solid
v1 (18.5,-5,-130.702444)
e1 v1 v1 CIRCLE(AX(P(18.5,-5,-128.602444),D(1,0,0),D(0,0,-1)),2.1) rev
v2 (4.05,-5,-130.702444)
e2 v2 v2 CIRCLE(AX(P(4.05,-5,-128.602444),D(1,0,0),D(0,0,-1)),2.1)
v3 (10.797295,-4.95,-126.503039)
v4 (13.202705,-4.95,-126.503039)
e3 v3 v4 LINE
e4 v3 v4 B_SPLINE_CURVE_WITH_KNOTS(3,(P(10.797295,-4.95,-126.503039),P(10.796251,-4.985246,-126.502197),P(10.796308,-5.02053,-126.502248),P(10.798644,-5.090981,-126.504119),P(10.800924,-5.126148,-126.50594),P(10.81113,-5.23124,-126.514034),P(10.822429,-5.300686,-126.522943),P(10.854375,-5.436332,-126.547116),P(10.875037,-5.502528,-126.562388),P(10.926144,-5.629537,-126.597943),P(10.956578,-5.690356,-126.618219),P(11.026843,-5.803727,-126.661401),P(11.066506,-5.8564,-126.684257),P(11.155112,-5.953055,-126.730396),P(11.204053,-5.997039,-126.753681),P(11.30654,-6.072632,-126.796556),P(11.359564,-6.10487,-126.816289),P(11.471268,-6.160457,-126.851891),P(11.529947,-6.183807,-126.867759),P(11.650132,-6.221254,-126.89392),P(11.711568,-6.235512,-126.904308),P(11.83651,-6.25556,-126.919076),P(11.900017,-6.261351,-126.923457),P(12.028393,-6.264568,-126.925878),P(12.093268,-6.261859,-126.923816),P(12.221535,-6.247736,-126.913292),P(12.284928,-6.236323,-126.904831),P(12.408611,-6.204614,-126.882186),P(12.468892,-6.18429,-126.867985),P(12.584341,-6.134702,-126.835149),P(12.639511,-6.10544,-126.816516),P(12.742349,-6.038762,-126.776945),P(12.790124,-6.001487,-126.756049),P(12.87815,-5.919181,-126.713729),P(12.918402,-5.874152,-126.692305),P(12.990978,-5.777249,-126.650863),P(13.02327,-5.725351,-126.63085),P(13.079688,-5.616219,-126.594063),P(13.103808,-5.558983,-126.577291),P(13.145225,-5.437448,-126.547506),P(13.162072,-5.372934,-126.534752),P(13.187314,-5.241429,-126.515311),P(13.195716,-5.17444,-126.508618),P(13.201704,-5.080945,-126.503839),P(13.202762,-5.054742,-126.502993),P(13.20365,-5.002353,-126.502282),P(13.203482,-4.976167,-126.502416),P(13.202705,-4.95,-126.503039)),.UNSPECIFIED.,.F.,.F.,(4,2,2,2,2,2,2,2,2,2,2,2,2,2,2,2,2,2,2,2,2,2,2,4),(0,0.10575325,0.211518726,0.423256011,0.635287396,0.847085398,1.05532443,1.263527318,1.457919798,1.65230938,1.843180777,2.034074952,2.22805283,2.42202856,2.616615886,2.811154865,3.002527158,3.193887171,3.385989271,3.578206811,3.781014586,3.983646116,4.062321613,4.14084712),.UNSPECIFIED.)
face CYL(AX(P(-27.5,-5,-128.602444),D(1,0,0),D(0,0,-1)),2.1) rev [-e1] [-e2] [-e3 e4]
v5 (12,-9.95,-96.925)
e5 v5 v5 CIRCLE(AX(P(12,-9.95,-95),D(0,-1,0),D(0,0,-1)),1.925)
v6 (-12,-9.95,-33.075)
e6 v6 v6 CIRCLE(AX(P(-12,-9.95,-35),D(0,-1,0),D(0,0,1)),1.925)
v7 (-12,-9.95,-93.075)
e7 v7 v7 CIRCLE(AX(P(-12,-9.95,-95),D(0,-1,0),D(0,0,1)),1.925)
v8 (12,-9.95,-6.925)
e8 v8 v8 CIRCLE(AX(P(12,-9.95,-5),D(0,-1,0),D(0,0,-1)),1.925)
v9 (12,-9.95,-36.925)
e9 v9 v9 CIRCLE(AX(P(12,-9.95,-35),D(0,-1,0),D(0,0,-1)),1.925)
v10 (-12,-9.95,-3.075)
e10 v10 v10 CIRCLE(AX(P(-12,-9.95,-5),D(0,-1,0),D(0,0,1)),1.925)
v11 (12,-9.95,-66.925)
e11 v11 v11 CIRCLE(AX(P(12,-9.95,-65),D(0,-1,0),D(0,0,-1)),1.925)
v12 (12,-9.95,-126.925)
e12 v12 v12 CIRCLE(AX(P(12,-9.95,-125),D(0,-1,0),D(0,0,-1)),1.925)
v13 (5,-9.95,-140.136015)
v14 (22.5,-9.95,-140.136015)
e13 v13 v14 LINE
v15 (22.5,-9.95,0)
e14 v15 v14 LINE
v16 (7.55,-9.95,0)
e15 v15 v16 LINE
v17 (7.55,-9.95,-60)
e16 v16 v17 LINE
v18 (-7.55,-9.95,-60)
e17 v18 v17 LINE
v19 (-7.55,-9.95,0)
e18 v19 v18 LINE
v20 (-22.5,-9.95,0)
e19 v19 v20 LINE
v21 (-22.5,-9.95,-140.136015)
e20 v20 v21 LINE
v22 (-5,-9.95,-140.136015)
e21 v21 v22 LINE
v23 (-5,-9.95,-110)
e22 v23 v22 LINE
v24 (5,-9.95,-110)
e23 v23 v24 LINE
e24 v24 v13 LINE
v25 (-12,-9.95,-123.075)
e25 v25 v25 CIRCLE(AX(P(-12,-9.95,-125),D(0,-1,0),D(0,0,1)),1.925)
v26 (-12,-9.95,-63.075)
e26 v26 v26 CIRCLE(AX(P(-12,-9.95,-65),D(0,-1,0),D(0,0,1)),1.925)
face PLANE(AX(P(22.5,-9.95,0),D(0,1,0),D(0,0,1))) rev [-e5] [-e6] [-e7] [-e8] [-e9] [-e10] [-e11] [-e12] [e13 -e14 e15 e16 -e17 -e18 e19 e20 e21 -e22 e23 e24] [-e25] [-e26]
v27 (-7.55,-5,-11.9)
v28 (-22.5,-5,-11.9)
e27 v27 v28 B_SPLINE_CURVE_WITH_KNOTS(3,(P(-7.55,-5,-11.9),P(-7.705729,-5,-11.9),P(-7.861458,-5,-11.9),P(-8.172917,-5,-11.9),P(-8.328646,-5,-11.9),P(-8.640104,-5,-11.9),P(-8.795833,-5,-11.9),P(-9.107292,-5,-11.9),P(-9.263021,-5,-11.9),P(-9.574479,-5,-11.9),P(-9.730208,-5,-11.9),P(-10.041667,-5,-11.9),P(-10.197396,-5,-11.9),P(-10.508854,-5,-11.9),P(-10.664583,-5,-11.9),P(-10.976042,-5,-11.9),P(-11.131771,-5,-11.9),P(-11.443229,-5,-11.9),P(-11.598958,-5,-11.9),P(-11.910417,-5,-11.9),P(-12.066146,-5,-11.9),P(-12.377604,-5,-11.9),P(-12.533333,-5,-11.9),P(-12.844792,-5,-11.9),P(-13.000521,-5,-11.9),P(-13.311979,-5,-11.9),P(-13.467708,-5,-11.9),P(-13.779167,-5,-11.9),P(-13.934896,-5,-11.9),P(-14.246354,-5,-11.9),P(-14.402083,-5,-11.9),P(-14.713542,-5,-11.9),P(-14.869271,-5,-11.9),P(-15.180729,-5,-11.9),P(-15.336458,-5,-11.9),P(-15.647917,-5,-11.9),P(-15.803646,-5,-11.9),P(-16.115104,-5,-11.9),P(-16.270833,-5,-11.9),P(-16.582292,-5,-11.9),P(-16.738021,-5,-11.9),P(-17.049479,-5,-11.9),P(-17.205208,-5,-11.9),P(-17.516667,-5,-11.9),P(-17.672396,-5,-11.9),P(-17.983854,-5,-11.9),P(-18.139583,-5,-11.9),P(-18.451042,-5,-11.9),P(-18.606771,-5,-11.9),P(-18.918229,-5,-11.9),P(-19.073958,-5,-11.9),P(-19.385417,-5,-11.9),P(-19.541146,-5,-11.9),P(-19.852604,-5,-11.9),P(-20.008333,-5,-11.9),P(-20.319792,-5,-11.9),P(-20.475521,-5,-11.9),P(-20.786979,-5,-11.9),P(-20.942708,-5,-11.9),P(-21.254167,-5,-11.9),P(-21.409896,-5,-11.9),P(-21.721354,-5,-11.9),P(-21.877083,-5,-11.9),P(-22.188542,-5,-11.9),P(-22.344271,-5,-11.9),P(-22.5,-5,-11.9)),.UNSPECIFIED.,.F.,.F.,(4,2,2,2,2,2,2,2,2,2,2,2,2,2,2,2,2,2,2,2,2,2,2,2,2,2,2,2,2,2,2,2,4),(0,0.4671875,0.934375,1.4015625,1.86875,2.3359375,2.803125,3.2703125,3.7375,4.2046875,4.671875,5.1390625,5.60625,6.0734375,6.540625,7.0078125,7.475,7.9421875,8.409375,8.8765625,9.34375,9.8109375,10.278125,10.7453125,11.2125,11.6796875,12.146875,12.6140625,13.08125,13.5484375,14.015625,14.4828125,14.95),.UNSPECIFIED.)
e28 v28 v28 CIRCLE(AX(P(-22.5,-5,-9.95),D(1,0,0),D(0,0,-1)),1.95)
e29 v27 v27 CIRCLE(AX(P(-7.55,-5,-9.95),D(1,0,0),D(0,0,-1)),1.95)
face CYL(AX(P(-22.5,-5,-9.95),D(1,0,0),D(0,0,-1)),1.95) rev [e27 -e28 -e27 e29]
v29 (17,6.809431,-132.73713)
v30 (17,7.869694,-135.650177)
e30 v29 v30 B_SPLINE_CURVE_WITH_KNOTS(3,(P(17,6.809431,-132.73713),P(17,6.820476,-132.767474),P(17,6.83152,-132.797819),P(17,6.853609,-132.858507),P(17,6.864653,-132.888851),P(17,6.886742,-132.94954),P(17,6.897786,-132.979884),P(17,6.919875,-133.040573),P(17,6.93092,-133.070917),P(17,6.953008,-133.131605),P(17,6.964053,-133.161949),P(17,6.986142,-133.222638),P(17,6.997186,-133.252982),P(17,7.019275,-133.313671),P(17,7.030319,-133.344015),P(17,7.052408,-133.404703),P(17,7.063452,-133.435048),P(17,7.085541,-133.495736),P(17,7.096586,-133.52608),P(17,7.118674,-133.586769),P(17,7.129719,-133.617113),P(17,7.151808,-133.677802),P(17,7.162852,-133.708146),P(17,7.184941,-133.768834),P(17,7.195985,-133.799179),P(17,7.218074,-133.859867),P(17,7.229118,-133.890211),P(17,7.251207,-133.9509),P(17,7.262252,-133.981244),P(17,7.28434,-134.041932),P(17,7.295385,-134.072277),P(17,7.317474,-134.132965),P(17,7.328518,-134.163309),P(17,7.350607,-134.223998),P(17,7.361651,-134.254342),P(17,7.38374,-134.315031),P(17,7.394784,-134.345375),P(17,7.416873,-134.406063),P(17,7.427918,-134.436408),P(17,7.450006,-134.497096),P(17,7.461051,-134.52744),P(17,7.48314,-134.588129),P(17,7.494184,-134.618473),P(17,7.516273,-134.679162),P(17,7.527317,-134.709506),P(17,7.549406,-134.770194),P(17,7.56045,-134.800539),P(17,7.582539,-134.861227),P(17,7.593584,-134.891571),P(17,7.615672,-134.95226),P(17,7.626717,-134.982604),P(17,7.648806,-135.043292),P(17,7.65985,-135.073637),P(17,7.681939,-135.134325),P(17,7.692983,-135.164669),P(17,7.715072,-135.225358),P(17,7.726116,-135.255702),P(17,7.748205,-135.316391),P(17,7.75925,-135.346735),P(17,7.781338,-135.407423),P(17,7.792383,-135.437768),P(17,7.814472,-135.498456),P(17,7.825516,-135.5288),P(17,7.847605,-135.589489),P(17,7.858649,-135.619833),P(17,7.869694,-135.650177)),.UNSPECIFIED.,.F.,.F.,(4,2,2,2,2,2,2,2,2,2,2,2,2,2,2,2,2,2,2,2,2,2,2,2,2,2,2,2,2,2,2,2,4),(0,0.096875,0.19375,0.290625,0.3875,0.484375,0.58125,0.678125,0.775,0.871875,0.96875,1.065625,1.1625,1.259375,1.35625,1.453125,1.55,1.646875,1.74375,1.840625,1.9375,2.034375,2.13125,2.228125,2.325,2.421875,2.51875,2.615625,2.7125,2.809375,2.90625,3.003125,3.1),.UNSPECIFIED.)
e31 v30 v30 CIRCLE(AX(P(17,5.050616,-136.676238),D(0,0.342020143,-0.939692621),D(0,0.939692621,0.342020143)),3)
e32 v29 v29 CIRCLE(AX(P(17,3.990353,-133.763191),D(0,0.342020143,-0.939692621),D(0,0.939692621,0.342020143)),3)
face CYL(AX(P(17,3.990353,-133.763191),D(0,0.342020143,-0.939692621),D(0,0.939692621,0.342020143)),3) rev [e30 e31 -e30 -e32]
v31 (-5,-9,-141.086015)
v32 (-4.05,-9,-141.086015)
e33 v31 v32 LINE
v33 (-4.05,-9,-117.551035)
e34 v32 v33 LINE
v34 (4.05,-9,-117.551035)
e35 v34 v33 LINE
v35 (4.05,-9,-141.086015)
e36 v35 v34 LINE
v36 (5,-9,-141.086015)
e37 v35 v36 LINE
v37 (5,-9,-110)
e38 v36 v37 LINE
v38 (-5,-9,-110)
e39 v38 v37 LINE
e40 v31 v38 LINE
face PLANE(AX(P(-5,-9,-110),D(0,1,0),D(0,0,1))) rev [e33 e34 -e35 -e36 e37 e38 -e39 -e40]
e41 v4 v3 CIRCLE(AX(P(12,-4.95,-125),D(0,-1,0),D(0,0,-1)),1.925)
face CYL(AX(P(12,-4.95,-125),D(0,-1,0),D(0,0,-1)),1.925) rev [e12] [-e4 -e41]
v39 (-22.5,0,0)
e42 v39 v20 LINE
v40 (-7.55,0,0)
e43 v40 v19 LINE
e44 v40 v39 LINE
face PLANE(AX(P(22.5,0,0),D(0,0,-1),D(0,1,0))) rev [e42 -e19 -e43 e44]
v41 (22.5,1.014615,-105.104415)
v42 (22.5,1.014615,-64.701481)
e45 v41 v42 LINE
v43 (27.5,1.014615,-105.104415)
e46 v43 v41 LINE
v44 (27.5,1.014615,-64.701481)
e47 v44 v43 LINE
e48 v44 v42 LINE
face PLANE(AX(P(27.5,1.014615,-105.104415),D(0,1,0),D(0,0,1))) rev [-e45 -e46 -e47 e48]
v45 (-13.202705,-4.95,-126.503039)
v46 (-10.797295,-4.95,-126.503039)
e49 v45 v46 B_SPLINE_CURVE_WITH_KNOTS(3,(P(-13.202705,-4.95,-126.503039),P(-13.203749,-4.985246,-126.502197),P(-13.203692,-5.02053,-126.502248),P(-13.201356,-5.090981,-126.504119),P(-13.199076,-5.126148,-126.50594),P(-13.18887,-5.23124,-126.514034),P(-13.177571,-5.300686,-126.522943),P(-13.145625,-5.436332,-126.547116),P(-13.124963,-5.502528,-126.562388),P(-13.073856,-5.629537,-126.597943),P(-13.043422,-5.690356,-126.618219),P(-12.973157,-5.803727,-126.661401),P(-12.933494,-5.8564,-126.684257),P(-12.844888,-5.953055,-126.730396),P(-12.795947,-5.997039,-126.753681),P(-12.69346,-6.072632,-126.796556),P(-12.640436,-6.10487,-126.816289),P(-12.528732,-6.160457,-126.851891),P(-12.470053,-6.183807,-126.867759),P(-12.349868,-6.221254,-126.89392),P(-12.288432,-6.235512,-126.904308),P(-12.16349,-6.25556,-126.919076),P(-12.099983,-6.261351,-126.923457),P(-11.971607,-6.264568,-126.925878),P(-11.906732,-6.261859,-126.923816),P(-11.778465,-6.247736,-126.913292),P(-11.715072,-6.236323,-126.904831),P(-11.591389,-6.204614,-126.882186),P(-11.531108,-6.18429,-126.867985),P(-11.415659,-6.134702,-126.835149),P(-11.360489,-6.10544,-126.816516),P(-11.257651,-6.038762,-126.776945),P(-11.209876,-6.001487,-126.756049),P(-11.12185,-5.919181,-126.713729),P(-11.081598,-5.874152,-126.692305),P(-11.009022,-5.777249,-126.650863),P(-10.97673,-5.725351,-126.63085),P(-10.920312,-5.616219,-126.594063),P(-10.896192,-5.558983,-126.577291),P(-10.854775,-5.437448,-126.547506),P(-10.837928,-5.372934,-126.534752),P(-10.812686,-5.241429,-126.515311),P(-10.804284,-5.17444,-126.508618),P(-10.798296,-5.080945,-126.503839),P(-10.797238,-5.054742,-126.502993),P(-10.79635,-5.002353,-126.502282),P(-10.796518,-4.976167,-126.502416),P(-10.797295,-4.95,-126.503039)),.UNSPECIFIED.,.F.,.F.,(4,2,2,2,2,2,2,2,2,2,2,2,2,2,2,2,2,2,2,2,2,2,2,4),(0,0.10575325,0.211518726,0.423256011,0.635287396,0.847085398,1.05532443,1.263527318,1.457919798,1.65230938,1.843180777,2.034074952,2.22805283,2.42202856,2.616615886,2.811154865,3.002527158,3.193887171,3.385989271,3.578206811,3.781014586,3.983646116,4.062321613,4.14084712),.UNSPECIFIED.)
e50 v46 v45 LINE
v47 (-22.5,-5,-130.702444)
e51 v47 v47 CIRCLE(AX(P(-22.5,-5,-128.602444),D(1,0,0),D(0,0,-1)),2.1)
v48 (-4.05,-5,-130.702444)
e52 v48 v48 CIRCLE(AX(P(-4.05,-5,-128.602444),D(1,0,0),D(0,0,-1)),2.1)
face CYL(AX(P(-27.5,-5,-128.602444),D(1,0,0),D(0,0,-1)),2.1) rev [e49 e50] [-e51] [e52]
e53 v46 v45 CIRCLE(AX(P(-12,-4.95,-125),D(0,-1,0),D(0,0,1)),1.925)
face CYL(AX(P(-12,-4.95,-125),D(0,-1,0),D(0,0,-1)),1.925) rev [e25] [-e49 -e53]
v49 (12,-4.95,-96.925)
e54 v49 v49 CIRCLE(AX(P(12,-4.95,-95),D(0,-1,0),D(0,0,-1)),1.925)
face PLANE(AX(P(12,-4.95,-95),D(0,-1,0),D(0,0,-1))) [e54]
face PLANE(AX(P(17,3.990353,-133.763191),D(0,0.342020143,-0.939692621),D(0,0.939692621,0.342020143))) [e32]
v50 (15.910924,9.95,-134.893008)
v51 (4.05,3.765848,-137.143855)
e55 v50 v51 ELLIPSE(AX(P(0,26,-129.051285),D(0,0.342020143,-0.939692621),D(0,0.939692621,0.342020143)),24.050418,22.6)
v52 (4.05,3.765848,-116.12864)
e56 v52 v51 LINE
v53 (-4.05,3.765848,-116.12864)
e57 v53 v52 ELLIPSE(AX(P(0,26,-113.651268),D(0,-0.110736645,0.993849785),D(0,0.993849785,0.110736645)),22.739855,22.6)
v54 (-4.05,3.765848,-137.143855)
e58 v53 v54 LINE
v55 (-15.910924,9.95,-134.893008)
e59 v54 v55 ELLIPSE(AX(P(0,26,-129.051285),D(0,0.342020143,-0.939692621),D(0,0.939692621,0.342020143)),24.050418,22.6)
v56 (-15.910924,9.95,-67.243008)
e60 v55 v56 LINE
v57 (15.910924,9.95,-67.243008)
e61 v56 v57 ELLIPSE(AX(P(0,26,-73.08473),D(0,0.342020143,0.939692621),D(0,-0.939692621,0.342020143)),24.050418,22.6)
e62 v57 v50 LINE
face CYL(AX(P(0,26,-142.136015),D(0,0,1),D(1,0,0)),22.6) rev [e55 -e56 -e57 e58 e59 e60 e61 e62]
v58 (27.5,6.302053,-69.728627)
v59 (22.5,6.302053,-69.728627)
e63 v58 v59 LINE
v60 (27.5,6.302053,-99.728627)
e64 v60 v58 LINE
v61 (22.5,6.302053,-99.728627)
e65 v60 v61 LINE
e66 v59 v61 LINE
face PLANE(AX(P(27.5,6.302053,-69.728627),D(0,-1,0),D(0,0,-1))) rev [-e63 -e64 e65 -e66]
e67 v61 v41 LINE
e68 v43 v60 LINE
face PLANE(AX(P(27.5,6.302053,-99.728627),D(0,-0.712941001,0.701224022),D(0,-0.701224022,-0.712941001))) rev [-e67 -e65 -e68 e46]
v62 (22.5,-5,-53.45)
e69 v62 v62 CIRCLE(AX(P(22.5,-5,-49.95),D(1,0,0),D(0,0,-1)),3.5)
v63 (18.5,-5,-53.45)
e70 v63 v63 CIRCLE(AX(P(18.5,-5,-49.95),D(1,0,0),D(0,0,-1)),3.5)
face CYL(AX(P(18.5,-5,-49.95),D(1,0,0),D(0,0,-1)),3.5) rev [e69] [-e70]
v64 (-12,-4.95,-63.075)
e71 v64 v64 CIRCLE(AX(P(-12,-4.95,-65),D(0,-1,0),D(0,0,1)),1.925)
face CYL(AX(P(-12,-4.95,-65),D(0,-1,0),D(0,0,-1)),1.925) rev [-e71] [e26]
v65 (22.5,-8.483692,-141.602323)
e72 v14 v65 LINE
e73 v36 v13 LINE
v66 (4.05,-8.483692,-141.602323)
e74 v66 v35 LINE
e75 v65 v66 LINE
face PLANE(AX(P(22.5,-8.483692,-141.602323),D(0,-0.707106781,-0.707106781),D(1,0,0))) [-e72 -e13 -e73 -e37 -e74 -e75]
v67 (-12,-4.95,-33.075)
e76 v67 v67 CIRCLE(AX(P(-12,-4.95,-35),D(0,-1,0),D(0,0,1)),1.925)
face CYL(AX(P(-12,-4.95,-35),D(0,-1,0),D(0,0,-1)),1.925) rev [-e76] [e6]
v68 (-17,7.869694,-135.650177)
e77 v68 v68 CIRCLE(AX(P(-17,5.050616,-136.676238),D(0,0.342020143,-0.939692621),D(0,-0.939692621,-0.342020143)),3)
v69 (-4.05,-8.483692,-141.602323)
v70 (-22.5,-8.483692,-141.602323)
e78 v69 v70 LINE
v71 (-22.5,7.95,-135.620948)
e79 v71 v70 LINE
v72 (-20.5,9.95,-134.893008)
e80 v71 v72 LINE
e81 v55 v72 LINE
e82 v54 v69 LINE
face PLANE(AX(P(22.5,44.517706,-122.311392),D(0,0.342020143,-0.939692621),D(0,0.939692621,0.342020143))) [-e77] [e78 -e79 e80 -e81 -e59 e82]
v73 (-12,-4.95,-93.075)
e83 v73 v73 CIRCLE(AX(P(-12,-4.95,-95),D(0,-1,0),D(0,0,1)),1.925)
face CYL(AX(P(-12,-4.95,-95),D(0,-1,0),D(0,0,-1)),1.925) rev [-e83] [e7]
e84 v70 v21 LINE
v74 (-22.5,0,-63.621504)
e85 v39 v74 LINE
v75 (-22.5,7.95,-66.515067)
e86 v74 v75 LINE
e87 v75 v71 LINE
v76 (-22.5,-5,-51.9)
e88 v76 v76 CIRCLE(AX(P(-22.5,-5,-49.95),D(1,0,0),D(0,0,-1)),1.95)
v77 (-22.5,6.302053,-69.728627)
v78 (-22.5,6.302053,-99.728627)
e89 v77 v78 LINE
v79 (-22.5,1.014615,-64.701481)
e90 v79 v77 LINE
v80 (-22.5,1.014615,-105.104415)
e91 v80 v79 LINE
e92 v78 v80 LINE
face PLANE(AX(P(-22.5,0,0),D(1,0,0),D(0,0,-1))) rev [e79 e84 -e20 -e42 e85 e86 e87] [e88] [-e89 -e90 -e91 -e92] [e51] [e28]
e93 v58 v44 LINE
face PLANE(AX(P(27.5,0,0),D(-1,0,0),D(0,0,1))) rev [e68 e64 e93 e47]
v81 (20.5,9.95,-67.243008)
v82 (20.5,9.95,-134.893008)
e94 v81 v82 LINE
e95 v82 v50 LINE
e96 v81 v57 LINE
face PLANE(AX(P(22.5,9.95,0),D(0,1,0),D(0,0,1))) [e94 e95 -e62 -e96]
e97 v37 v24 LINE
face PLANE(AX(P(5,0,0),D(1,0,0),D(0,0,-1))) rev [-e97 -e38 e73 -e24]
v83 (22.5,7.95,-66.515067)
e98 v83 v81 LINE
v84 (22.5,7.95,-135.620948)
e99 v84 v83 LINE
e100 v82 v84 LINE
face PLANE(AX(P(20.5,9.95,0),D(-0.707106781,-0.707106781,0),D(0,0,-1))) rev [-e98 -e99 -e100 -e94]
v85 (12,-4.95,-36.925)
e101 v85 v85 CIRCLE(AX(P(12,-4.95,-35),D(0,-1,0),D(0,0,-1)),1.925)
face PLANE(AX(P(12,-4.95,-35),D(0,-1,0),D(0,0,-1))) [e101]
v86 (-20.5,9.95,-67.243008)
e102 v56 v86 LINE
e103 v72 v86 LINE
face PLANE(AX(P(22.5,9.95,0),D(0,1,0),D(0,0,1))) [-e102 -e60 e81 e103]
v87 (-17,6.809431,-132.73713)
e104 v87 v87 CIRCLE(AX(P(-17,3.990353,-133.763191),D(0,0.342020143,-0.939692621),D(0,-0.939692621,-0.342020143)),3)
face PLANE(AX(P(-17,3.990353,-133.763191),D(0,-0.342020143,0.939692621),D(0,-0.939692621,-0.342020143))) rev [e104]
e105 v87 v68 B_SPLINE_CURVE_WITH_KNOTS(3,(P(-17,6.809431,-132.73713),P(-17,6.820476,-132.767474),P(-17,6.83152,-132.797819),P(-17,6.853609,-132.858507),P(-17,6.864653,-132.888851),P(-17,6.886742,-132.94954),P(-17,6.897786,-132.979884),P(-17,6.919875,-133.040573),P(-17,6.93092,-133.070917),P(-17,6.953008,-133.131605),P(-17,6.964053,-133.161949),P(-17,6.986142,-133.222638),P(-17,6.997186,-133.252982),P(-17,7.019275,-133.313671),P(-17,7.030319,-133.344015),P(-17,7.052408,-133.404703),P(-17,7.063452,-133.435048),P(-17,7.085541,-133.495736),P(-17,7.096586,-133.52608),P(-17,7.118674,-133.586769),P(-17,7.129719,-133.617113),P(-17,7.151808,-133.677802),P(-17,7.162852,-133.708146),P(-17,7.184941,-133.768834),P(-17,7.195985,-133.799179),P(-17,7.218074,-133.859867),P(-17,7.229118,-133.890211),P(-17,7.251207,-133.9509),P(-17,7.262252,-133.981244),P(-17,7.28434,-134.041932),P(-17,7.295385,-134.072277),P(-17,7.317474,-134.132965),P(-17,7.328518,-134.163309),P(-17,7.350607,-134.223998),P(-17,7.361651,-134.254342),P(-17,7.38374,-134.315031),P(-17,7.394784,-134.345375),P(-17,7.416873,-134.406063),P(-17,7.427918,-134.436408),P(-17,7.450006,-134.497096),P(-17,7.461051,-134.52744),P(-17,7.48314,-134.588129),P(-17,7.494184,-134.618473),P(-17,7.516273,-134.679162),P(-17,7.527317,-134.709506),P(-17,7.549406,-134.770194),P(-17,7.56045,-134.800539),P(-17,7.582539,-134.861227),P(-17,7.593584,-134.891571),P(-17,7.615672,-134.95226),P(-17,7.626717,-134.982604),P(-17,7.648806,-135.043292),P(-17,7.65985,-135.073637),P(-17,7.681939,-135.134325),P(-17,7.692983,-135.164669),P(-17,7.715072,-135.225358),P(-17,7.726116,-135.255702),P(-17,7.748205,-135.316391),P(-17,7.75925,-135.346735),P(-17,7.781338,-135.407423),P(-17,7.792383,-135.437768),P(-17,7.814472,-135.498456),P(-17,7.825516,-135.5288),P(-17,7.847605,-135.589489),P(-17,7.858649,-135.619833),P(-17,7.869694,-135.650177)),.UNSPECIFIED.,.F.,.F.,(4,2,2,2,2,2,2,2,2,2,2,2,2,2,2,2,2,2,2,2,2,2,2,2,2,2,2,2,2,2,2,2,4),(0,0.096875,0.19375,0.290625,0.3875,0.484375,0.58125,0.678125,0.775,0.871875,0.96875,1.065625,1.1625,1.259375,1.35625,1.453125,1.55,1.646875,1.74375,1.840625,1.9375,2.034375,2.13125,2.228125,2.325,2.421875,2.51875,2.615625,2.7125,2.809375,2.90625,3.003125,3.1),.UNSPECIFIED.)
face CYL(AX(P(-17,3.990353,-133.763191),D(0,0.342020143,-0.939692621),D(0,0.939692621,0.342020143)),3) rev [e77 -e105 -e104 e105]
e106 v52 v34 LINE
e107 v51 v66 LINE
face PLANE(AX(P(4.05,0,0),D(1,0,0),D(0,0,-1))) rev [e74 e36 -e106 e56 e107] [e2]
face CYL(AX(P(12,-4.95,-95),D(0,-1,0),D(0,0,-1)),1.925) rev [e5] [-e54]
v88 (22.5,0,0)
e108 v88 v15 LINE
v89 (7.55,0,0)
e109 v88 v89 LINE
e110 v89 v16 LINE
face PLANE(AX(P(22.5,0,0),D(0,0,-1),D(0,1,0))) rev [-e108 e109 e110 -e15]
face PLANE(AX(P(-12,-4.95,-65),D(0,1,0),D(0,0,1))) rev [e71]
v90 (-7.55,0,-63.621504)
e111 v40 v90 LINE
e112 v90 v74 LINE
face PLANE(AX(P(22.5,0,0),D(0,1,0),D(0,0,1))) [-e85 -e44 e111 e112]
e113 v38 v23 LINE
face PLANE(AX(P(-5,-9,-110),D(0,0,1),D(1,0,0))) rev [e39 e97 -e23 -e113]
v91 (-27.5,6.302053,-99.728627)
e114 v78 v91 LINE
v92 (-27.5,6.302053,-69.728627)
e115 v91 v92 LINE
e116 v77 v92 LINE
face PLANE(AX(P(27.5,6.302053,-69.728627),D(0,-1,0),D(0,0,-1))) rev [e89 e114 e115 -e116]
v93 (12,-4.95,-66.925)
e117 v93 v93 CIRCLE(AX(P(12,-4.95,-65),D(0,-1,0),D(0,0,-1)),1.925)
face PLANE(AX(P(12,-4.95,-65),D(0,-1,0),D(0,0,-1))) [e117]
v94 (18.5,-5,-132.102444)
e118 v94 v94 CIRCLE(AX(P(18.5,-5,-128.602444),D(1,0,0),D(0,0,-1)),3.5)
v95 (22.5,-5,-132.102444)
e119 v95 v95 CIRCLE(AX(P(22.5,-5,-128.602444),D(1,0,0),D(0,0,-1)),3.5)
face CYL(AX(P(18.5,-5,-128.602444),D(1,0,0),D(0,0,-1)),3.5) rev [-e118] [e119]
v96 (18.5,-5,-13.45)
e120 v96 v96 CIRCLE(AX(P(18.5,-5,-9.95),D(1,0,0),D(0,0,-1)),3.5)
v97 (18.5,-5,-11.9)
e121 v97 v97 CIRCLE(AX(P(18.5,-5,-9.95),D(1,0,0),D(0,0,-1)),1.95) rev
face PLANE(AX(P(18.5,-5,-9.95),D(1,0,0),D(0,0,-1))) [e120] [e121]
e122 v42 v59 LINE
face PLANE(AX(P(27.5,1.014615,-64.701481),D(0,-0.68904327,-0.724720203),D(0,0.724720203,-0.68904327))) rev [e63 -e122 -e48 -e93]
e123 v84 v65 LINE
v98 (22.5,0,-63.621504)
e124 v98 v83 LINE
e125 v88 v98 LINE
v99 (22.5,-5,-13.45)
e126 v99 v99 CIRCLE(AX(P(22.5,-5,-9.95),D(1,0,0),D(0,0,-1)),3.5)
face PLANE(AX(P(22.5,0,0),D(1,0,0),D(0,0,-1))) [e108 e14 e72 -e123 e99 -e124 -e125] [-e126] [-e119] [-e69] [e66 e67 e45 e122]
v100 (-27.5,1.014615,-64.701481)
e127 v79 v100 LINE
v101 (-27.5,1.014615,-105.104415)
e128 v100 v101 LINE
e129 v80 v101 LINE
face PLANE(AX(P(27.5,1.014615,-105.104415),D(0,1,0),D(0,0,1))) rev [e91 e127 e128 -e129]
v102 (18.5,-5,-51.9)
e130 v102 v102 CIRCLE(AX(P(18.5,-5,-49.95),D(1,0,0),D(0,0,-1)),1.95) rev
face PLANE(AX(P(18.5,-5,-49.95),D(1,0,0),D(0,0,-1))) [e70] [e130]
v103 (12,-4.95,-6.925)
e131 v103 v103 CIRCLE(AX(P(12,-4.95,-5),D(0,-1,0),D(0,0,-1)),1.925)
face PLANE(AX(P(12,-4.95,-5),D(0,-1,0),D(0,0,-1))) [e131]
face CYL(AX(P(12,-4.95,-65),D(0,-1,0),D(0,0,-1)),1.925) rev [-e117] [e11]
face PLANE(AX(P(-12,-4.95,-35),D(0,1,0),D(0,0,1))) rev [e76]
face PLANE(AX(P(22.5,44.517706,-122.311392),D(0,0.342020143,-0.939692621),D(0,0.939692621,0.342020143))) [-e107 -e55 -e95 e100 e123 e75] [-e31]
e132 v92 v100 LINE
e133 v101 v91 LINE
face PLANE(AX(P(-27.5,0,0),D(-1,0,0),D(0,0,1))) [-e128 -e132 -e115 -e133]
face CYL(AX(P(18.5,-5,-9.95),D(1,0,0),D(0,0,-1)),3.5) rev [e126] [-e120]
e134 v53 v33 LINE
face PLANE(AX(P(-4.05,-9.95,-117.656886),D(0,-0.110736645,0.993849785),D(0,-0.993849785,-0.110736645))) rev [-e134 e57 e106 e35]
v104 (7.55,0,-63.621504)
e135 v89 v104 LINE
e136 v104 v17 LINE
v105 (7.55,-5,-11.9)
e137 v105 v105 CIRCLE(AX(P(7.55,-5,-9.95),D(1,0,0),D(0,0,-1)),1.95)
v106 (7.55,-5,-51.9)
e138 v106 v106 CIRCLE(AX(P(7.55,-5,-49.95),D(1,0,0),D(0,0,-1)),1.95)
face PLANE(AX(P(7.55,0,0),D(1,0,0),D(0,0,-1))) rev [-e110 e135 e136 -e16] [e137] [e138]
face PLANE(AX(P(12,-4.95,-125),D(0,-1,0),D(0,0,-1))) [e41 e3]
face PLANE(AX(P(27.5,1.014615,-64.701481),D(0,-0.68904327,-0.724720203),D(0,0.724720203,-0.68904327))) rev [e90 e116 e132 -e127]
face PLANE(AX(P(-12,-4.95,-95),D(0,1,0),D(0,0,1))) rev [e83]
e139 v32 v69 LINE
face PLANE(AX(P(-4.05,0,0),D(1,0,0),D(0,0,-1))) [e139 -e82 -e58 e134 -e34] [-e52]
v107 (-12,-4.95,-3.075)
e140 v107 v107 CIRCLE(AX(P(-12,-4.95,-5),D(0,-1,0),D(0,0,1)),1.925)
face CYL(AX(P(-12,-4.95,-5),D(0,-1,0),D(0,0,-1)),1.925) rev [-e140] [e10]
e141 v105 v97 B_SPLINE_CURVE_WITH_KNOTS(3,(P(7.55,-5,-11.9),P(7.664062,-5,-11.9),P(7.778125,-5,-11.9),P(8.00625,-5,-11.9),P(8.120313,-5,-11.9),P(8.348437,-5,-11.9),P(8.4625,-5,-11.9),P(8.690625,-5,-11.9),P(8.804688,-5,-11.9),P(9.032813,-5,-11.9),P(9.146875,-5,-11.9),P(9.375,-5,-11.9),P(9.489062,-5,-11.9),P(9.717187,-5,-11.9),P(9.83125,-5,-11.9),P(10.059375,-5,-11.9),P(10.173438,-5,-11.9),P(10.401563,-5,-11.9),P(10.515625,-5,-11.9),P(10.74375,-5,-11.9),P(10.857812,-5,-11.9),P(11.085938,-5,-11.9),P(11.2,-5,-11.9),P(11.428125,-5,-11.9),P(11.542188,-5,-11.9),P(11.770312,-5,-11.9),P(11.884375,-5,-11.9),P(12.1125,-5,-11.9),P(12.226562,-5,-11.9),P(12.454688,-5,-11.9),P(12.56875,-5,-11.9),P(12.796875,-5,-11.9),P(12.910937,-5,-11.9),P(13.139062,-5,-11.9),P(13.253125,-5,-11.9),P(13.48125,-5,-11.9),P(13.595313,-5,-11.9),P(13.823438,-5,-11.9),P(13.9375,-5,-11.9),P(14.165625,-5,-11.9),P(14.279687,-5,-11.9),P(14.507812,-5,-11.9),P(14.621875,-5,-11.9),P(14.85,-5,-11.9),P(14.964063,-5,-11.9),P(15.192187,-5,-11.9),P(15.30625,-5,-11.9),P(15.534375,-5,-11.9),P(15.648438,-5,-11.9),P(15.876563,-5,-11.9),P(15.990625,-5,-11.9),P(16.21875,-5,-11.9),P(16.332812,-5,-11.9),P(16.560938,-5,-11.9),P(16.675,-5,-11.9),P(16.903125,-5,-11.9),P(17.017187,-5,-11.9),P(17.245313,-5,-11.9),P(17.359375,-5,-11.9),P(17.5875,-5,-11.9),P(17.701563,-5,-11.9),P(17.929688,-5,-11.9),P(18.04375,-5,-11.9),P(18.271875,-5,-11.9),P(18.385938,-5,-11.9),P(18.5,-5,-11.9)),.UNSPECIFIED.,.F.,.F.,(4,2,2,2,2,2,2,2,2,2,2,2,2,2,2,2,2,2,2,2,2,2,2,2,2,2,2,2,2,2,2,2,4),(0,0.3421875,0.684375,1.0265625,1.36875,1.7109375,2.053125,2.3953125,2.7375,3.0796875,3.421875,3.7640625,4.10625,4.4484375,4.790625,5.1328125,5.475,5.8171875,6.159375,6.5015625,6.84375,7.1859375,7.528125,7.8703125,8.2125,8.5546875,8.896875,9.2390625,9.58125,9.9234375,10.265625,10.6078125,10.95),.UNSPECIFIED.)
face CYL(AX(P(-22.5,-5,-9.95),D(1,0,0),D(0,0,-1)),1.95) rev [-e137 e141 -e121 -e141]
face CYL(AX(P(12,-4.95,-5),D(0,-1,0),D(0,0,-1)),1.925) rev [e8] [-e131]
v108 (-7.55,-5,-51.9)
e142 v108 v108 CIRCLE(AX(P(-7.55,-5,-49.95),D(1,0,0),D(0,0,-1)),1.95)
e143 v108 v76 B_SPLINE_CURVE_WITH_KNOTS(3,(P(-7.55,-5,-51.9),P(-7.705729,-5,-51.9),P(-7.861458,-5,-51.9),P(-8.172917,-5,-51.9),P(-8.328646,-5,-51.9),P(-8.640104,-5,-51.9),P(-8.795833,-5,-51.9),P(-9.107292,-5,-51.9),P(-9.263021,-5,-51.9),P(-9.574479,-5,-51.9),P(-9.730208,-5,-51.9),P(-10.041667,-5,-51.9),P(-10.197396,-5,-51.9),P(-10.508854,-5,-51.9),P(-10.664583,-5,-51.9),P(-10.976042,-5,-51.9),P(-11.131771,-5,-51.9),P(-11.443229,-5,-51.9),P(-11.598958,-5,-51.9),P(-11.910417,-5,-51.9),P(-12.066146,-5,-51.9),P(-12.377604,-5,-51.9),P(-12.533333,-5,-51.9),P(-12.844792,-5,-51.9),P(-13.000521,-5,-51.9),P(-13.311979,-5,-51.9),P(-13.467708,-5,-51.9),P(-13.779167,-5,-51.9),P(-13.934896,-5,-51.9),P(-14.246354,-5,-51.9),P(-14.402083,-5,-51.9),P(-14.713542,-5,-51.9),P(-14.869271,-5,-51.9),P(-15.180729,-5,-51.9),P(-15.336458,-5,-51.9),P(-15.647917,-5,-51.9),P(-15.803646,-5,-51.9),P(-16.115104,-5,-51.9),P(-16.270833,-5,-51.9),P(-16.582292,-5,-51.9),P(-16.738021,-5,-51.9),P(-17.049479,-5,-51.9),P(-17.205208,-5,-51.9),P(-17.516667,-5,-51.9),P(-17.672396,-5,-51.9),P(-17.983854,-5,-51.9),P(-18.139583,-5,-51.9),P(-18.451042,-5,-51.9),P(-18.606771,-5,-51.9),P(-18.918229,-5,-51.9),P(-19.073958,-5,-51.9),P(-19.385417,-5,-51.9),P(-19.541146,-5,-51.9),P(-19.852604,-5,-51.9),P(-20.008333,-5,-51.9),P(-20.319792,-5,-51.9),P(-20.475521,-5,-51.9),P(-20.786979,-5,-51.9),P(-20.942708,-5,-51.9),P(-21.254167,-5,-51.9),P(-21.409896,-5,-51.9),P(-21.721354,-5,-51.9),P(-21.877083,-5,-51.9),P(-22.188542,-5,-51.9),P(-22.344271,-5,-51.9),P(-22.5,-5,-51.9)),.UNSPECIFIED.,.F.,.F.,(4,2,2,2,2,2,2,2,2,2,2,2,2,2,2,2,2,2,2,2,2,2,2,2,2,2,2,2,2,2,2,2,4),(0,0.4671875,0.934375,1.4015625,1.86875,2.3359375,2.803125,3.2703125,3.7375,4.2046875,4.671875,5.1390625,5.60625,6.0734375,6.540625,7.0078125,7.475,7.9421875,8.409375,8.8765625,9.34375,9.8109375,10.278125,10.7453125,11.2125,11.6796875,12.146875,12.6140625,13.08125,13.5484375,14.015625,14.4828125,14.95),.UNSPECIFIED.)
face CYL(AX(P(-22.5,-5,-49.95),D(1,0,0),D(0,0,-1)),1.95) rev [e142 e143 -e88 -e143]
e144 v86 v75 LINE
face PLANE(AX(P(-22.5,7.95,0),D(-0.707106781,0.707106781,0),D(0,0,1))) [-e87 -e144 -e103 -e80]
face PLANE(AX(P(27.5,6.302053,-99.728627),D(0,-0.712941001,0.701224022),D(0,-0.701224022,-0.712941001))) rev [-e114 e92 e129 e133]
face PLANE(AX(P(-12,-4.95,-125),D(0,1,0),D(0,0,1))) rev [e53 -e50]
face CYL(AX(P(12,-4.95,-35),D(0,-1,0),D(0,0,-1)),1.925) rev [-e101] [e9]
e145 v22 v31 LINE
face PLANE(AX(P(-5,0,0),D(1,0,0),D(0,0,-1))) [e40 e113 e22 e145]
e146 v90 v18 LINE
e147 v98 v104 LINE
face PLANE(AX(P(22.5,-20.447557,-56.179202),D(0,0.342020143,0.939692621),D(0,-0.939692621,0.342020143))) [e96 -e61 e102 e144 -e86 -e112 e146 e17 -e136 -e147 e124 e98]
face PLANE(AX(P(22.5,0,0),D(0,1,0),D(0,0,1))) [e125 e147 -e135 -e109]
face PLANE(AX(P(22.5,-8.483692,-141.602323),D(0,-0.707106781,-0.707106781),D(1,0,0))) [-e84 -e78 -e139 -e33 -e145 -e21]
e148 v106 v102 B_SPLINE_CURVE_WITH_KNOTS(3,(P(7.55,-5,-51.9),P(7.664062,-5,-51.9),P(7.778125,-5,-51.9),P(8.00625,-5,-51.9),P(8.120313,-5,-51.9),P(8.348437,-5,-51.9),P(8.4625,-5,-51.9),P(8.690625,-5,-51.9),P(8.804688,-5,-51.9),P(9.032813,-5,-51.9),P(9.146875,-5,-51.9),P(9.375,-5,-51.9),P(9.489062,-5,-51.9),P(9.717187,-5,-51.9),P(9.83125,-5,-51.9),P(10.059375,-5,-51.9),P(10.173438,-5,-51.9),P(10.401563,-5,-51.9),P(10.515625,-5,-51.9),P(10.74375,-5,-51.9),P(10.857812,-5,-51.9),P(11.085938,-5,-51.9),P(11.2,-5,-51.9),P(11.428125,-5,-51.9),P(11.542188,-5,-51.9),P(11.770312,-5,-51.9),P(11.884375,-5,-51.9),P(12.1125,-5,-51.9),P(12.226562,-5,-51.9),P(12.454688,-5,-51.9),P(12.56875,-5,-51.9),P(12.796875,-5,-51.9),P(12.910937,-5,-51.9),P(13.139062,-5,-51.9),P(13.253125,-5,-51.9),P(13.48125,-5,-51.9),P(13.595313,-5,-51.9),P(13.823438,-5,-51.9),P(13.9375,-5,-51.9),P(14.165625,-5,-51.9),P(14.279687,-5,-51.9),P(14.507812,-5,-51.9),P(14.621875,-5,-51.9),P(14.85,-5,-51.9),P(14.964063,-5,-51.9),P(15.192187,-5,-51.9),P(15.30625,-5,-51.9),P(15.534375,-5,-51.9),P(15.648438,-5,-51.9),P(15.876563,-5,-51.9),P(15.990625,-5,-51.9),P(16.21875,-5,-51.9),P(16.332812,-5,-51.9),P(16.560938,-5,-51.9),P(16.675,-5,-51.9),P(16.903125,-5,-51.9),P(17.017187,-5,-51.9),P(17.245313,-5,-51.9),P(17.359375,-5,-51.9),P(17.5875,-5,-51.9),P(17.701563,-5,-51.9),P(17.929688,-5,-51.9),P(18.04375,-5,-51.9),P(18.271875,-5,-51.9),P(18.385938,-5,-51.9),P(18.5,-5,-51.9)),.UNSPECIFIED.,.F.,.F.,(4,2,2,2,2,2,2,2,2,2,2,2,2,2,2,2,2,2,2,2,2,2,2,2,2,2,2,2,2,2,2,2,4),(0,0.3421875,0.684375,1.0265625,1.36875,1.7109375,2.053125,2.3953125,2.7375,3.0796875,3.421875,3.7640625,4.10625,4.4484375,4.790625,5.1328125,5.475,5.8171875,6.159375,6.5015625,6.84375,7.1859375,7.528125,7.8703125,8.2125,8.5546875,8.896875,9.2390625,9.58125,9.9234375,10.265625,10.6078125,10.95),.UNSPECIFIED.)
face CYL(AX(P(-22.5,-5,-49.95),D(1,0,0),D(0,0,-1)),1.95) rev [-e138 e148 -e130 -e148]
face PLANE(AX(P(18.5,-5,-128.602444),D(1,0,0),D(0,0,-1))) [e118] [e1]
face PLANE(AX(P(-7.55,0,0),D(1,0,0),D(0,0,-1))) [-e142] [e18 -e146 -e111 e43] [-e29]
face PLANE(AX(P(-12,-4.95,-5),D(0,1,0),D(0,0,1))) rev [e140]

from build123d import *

# Parameters (mm, degrees)
SKETCH_1_W               = 63.621503831
SKETCH_1_H               = 9.95
EXTRUDE_1_DEPTH          = 22.5
CUT_EXTRUDE_START        = -7.55
CUT_EXTRUDE_1_DEPTH      = 15.1
CUT_EXTRUDE_2_DEPTH      = 145.249434495
CUT_EXTRUDE_2_DEPTH_BACK = 145.249434495
SKETCH_2_R               = 1.95
EXTRUDE_3_DEPTH          = 27.5
CUT_EXTRUDE_6_DEPTH      = 4.05
SKETCH_3_R               = 22.6
CUT_EXTRUDE_3_DEPTH      = 146.113401697
CUT_EXTRUDE_7_DEPTH      = 146.113401697
CUT_EXTRUDE_7_DEPTH_BACK = 146.113401697
SKETCH_10_R              = 2.1
SKETCH_11_W              = 39.483635772
SKETCH_11_H              = 6.923947262
CUT_EXTRUDE_8_DEPTH      = 5
CHAMFER_1_SIZE           = 2
SKETCH_4_R               = 3.5
CUT_EXTRUDE_4_DEPTH      = 4
SKETCH_12_R              = 3
CUT_EXTRUDE_9_DEPTH      = 3.1
CHAMFER_2_SIZE           = 2
CHAMFER_2_SIZE2          = 1.560412017
CHAMFER_2_EDGE_2_SIZE    = 2
CHAMFER_2_EDGE_2_SIZE2   = 1.560412017
SKETCH_13_R              = 1.925
CUT_EXTRUDE_10_DEPTH     = 5


# Read off the part's stored shape, not the designer's step: 컷-돌출1
with BuildPart() as part:
    # 스케치1 → 보스-돌출1 (new, symmetric)
    with BuildSketch(Plane(origin=(0, 0, 0), x_dir=(0, 0, -1), z_dir=(1, 0, 0))):
        with Locations((31.810751916, -4.975)):
            Rectangle(SKETCH_1_W, SKETCH_1_H)
        Polygon((142.136015324, -9.95), (63.621503831, -9.95), (63.621503831, 0), (67.243007662, 9.95), (134.893007662, 9.95), align=None)
        Polygon((63.621503831, -9.95), (63.621503831, 0), (60, -9.95), align=None)
    extrude(amount=EXTRUDE_1_DEPTH, both=True)

    # 컷-돌출1 outline → 컷-돌출1 (cut)
    with BuildSketch(Plane(origin=(0, 0, 0), x_dir=(0, 0, -1), z_dir=(1, 0, 0)).offset(CUT_EXTRUDE_START)):
        Polygon((60, -9.95), (63.621503831, 0), (0, 0), (0, -9.95), align=None)
    extrude(amount=CUT_EXTRUDE_1_DEPTH, mode=Mode.SUBTRACT)

    # 스케치2 → 컷-돌출2 (cut, two sides: drawn at the far end of the back side and taken through both)
    with BuildSketch(Plane(origin=(0, 0, 0), x_dir=(0, 0, -1), z_dir=(1, 0, 0)).offset(-CUT_EXTRUDE_2_DEPTH_BACK)):
        with Locations((9.95, -5)):
            Circle(SKETCH_2_R)
        with Locations((49.95, -5)):
            Circle(SKETCH_2_R)
    extrude(amount=CUT_EXTRUDE_2_DEPTH + CUT_EXTRUDE_2_DEPTH_BACK, mode=Mode.SUBTRACT)

    # 스케치6 → 보스-돌출3 (add, symmetric)
    with BuildSketch(Plane(origin=(0, 0, 0), x_dir=(0, 0, -1), z_dir=(1, 0, 0))):
        Polygon((64.701480994, 1.014614629), (69.728626839, 6.30205348), (99.728626839, 6.30205348), (105.104415209, 1.014614629), align=None)
    extrude(amount=EXTRUDE_3_DEPTH, both=True)

    # 스케치9 → 컷-돌출6 (cut, symmetric)
    with BuildSketch(Plane(origin=(0, 0, 0), x_dir=(0, 0, -1), z_dir=(1, 0, 0))):
        Polygon((139.292204442, 9.95), (148.391731499, -9.95), (117.656886036, -9.95), (115.43958996, 9.95), align=None)
    extrude(amount=CUT_EXTRUDE_6_DEPTH, both=True, mode=Mode.SUBTRACT)

    # 스케치3 → 컷-돌출3 (cut, through all)
    with BuildSketch(Plane.XY):
        with Locations((0, 26)):
            Circle(SKETCH_3_R)
    extrude(amount=-CUT_EXTRUDE_3_DEPTH, mode=Mode.SUBTRACT)

    # 스케치10 → 컷-돌출7 (cut, two sides: drawn at the far end of the back side and taken through both)
    with BuildSketch(Plane(origin=(0, 0, 0), x_dir=(0, 0, -1), z_dir=(1, 0, 0)).offset(-CUT_EXTRUDE_7_DEPTH_BACK)):
        with Locations((128.602443504, -5)):
            Circle(SKETCH_10_R)
    extrude(amount=CUT_EXTRUDE_7_DEPTH + CUT_EXTRUDE_7_DEPTH_BACK, mode=Mode.SUBTRACT)

    # 스케치11 → 컷-돌출8 (cut, symmetric)
    with BuildSketch(Plane(origin=(0, 0, 0), x_dir=(0, 0, -1), z_dir=(1, 0, 0))):
        with Locations((129.741817886, -12.461973631)):
            Rectangle(SKETCH_11_W, SKETCH_11_H)
    extrude(amount=CUT_EXTRUDE_8_DEPTH, both=True, mode=Mode.SUBTRACT)

    # 모따기1
    chamfer_1_edges = [part.edges().sort_by_distance(p)[0] for p in [
        (22.5, 9.95, -101.068007662),
        (-22.5, 9.95, -101.068007662),
    ]]
    chamfer(chamfer_1_edges, length=CHAMFER_1_SIZE)

    # 스케치4 → 컷-돌출4 (cut)
    with BuildSketch(Plane(origin=(22.5, 0, 0), x_dir=(0, 0, -1), z_dir=(1, 0, 0))):
        with Locations((9.95, -5)):
            Circle(SKETCH_4_R)
        with Locations((49.95, -5)):
            Circle(SKETCH_4_R)
        with Locations((128.602443504, -5)):
            Circle(SKETCH_4_R)
    extrude(amount=-CUT_EXTRUDE_4_DEPTH, mode=Mode.SUBTRACT)

    # 스케치12 → 컷-돌출9 (cut)
    with BuildSketch(Plane(origin=(0, 44.517705875, -122.311391657), x_dir=(-1, 0, 0), z_dir=(0, 0.3420201433256732, -0.9396926207859068))):
        with Locations(Location((-17, -42, 0), (0, 0, 90))):
            Circle(SKETCH_12_R)
        with Locations(Location((17, -42, 0), (0, 0, 90))):
            Circle(SKETCH_12_R)
    extrude(amount=-CUT_EXTRUDE_9_DEPTH, mode=Mode.SUBTRACT)

    # 모따기2
    chamfer_2_edges = [part.edges().sort_by_distance(p)[0] for p in [
        (-13.75, -9.95, -142.136015324),
    ]]
    chamfer_2_side = [part.faces().sort_by_distance(p)[0] for p in [
        (0, -9.95, -74.847019357),
    ]]
    chamfer(chamfer_2_edges, length=CHAMFER_2_SIZE, length2=CHAMFER_2_SIZE2, reference=chamfer_2_side[0])

    # 모따기2 edge 2
    chamfer_2_edge_2_edges = [part.edges().sort_by_distance(p)[0] for p in [
        (13.75, -9.95, -142.136015324),
    ]]
    chamfer_2_edge_2_side = [part.faces().sort_by_distance(p)[0] for p in [
        (0, -9.95, -74.847019357),
    ]]
    chamfer(chamfer_2_edge_2_edges, length=CHAMFER_2_EDGE_2_SIZE, length2=CHAMFER_2_EDGE_2_SIZE2, reference=chamfer_2_edge_2_side[0])

    # 스케치13 → 컷-돌출10 (cut)
    with BuildSketch(Plane.XZ.offset(9.95)):
        with Locations(Location((12, -5, 0), (0, 0, 270))):
            Circle(SKETCH_13_R)
        with Locations(Location((12, -35, 0), (0, 0, 270))):
            Circle(SKETCH_13_R)
        with Locations(Location((12, -65, 0), (0, 0, 270))):
            Circle(SKETCH_13_R)
        with Locations(Location((-12, -65, 0), (0, 0, 90))):
            Circle(SKETCH_13_R)
        with Locations(Location((-12, -35, 0), (0, 0, 90))):
            Circle(SKETCH_13_R)
        with Locations(Location((-12, -5, 0), (0, 0, 90))):
            Circle(SKETCH_13_R)
        with Locations(Location((12, -95, 0), (0, 0, 270))):
            Circle(SKETCH_13_R)
        with Locations(Location((12, -125, 0), (0, 0, 270))):
            Circle(SKETCH_13_R)
        with Locations(Location((-12, -125, 0), (0, 0, 231.333825211))):
            Circle(SKETCH_13_R)
        with Locations(Location((-12, -95, 0), (0, 0, 90))):
            Circle(SKETCH_13_R)
    extrude(amount=-CUT_EXTRUDE_10_DEPTH, mode=Mode.SUBTRACT)


solid = part.part
